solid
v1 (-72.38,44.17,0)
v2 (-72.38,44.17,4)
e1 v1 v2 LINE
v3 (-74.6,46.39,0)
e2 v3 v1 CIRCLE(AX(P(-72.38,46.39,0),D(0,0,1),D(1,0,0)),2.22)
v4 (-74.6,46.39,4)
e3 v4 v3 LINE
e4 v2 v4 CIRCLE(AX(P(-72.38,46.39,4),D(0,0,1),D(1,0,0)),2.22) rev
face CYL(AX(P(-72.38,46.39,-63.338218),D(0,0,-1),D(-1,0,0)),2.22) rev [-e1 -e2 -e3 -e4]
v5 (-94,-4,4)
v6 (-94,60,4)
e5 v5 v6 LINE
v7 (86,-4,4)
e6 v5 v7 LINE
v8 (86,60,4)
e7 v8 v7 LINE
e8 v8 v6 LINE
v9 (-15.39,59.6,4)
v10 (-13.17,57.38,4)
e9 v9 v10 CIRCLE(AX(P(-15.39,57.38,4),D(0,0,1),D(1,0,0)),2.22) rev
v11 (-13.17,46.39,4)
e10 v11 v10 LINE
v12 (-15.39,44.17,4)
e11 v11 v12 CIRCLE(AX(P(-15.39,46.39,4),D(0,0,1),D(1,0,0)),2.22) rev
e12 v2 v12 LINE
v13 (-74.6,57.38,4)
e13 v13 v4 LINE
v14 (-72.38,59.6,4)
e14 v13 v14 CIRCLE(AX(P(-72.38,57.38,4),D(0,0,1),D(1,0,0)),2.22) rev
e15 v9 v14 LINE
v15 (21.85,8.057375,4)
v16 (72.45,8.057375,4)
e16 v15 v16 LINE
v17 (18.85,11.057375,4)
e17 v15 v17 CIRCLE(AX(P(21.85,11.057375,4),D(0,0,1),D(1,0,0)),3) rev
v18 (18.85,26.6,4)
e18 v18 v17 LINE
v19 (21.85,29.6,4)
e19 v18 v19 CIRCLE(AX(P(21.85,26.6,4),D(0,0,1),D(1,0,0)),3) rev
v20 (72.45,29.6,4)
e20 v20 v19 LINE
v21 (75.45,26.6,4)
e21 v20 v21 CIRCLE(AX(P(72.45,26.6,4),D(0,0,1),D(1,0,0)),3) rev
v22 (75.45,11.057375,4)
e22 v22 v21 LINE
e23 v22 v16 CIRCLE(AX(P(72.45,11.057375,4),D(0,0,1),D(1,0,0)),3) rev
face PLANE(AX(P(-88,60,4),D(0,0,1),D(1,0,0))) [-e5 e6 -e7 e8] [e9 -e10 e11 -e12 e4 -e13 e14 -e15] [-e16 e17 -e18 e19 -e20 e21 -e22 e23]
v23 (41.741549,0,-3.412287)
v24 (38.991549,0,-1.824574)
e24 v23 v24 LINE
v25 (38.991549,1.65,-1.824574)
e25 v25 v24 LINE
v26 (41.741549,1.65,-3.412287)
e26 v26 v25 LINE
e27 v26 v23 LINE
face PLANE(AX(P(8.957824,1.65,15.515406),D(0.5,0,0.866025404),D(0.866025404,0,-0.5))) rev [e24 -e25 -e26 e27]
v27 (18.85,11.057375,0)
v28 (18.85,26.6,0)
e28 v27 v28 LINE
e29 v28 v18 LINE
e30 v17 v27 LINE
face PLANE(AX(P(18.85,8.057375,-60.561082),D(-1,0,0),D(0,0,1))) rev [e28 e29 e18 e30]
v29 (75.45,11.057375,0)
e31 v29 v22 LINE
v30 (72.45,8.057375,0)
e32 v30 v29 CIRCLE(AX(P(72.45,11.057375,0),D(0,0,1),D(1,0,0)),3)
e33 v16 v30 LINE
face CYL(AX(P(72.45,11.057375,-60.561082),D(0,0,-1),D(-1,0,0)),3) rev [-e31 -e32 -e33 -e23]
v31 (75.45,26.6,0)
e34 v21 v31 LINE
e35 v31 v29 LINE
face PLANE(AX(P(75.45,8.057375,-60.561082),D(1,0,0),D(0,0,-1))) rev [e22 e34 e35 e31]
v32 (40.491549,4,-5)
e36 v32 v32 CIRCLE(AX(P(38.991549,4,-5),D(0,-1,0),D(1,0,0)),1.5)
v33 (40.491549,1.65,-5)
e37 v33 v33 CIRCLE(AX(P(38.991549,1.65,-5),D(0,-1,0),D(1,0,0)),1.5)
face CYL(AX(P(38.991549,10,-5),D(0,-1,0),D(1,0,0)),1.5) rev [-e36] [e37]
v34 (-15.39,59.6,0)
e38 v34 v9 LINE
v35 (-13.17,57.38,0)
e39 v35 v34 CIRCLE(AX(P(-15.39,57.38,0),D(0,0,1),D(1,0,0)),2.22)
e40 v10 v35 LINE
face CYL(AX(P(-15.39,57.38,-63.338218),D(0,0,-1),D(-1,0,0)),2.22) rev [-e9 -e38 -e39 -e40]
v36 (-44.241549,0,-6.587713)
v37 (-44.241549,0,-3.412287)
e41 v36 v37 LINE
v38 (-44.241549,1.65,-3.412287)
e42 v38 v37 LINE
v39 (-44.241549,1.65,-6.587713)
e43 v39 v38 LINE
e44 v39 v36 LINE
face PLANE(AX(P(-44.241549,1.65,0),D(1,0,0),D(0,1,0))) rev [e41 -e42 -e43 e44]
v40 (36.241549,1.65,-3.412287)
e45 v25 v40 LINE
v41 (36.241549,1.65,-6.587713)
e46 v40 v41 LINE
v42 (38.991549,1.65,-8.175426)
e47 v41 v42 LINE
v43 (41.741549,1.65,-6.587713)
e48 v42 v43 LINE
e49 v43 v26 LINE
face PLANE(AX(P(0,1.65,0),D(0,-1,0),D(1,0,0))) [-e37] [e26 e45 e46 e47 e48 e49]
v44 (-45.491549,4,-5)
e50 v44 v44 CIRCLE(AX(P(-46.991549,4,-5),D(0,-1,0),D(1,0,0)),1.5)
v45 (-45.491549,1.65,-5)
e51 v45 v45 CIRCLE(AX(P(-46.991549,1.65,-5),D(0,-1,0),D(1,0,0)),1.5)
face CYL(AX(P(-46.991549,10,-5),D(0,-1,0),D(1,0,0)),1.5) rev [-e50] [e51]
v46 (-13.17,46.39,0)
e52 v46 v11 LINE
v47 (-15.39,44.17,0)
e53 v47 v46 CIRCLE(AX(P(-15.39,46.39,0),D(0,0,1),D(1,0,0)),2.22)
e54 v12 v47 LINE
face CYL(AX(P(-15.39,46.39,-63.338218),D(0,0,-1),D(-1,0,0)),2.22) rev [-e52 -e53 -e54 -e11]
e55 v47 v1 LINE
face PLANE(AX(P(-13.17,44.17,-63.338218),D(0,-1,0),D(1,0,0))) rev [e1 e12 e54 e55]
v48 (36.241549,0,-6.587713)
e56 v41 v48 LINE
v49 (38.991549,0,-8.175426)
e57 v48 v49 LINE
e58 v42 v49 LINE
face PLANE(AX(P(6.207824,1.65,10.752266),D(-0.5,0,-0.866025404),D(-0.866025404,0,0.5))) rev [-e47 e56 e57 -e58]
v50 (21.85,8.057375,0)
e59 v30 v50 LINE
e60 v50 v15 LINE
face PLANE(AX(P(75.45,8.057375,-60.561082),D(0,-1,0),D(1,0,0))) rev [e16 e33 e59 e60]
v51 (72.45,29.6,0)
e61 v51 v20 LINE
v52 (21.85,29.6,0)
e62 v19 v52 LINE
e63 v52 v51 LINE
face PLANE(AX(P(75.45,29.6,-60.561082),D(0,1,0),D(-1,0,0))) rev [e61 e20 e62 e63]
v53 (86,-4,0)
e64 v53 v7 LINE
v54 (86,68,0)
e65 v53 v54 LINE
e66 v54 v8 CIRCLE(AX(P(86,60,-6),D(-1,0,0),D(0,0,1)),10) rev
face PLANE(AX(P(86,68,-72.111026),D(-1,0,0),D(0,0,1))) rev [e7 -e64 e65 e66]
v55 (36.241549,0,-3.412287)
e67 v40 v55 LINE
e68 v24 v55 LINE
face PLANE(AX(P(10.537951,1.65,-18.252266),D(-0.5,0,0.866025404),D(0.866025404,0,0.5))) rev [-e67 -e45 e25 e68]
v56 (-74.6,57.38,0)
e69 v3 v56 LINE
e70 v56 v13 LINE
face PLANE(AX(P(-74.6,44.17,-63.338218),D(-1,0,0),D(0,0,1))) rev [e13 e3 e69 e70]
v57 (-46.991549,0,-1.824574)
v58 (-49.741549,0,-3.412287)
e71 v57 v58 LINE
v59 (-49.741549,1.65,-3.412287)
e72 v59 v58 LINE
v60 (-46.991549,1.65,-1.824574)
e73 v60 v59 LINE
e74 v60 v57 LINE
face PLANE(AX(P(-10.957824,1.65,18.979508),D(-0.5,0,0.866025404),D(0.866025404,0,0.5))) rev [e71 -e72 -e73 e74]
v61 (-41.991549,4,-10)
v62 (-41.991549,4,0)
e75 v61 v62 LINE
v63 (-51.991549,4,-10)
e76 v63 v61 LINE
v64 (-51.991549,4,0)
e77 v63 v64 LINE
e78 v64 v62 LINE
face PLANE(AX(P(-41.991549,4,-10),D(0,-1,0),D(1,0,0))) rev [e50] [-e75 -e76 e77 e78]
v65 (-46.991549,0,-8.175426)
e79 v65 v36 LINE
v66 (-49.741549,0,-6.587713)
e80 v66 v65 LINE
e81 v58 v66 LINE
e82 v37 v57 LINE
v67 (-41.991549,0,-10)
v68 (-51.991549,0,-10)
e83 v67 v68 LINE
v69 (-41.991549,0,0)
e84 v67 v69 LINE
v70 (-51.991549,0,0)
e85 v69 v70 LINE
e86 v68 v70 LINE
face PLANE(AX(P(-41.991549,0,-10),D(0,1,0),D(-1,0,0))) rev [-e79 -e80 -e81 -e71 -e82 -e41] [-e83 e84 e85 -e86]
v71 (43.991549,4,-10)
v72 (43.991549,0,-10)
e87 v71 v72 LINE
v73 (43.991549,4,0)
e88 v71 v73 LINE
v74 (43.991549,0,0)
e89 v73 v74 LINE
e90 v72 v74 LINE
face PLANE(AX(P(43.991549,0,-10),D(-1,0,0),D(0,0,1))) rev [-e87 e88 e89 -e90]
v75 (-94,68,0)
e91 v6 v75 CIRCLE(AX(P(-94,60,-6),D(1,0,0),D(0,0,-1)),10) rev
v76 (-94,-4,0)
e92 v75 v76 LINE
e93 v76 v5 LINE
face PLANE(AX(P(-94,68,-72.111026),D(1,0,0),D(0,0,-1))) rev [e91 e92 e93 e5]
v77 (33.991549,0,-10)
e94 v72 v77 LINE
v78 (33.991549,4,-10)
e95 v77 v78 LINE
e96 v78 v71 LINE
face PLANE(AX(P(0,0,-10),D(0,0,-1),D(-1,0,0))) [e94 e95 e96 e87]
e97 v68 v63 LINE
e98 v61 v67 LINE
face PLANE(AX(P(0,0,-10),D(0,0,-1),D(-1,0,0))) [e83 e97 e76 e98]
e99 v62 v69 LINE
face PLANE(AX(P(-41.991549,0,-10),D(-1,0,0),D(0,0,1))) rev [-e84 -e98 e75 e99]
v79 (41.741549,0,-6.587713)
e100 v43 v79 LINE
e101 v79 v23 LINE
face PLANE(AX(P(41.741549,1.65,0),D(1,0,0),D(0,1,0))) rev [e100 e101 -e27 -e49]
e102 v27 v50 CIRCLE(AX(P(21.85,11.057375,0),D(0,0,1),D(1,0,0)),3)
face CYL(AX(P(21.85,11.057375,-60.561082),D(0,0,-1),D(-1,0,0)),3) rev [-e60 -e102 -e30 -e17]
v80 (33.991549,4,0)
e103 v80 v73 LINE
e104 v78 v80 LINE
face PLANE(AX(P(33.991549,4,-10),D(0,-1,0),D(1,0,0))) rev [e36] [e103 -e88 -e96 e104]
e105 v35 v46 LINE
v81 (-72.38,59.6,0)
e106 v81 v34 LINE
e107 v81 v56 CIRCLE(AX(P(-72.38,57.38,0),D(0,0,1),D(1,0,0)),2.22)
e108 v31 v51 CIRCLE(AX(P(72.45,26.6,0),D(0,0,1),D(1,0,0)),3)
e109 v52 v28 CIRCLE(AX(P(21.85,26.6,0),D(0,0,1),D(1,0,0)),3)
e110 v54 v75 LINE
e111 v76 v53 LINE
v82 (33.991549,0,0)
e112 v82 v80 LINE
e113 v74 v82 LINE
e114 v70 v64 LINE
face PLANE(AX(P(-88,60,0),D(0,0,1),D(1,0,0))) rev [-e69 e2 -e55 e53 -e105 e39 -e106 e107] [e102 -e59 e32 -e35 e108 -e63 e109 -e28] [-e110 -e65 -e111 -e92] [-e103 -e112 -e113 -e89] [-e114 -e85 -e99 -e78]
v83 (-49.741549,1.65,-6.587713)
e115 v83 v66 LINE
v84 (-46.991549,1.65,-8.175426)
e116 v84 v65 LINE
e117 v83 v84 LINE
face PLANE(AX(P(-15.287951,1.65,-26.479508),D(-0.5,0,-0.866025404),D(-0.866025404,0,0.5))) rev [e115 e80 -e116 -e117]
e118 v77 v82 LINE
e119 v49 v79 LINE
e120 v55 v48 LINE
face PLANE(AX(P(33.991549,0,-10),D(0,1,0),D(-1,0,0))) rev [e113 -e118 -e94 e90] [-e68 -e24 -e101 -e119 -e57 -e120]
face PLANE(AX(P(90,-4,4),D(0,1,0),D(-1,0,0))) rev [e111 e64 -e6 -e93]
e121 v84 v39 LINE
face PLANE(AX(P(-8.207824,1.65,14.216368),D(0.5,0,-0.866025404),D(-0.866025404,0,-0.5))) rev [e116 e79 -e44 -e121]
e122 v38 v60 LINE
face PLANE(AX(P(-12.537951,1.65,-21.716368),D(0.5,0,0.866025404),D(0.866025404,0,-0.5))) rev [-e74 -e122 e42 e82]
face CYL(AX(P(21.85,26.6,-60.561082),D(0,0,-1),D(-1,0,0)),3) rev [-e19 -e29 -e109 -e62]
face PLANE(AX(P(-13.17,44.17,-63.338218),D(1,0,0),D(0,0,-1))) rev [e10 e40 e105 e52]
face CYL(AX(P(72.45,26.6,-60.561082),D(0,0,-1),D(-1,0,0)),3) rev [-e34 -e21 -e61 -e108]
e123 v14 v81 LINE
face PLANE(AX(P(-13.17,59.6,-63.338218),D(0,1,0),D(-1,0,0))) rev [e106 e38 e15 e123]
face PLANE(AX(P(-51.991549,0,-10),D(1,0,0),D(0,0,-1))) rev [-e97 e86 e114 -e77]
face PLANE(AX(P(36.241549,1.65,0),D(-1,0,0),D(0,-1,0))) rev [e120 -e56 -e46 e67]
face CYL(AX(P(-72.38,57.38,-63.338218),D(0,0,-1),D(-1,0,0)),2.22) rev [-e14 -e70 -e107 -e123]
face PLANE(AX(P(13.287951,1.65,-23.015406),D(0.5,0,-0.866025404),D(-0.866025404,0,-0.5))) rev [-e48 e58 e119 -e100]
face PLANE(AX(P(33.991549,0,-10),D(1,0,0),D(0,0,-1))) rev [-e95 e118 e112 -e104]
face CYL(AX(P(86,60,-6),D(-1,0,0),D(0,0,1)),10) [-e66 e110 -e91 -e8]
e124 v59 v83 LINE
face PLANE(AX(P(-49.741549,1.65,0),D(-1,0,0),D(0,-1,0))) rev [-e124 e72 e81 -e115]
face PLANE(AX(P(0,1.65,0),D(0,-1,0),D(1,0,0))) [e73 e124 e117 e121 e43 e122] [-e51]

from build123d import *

# Parameters (mm, degrees)
SALIENTE_EXTRUIR1_DEPTH = 4
CROQUIS2_W              = 10
CROQUIS2_H              = 4
SALIENTE_EXTRUIR2_DEPTH = 10
CROQUIS3_R              = 1.5
CORTAR_EXTRUIR1_DEPTH   = 10
CROQUIS3_3_R            = 1.5
CORTAR_EXTRUIR2_DEPTH   = 1.65
REDONDEO2_R             = 10
CORTAR_EXTRUIR4_REACH   = 121.7
CROQUIS4_W              = 14.4
CROQUIS4_H              = 16.36262465
CROQUIS4_W_2            = 16.3
CROQUIS4_H_2            = 13.9
CROQUIS4_W_3            = 15.3
CROQUIS4_H_3            = 16.22
CROQUIS5_W              = 56.6
CROQUIS5_H              = 21.54262465
CORTAR_EXTRUIR5_DEPTH   = 4
REDONDEO3_R             = 3
CROQUIS6_W              = 61.43
CROQUIS6_H              = 15.43
CORTAR_EXTRUIR6_DEPTH   = 4
REDONDEO4_R             = 2.22
CROQUIS8_W              = 4
CROQUIS8_H              = 72
CORTAR_EXTRUIR7_DEPTH   = 4


with BuildPart() as part:
    # Croquis1 → Saliente-Extruir1 (new body)
    with BuildSketch(Plane.XY):
        with BuildLine():
            Line((-98, 60), (-98, -4))
            Line((-98, -4), (90, -4))
            Line((90, -4), (90, 60))
            ThreePointArc((90, 60), (88.94427191, 64.472135955), (86, 68))
            Line((86, 68), (-94, 68))
            ThreePointArc((-94, 68), (-96.94427191, 64.472135955), (-98, 60))
        make_face()
    extrude(amount=SALIENTE_EXTRUIR1_DEPTH)

    # Croquis2 → Saliente-Extruir2 (add)
    with BuildSketch(Plane(origin=(0, 0, 0), x_dir=(-1, 0, 0), z_dir=(0, 0, -1))):
        with Locations((46.991549296, 2)):
            Rectangle(CROQUIS2_W, CROQUIS2_H)
        with Locations((-38.991549296, 2)):
            Rectangle(CROQUIS2_W, CROQUIS2_H)
    extrude(amount=SALIENTE_EXTRUIR2_DEPTH)

    # Croquis3 → Cortar-Extruir1 (cut)
    with BuildSketch(Plane.XZ):
        with Locations((38.991549296, -5)):
            Circle(CROQUIS3_R)
        with Locations((-46.991549296, -5)):
            Circle(CROQUIS3_R)
    extrude(amount=-CORTAR_EXTRUIR1_DEPTH, mode=Mode.SUBTRACT)

    # Croquis3<3> → Cortar-Extruir2 (cut)
    # profile 1 of 2: a face of its own
    with BuildSketch(Plane.XZ):
        Polygon((-46.991549296, -8.175426481), (-44.241549296, -6.58771324), (-44.241549296, -3.41228676), (-46.991549296, -1.824573519), (-49.741549296, -3.41228676), (-49.741549296, -6.58771324), align=None)
        with Locations((-46.991549296, -5)):
            Circle(CROQUIS3_3_R, mode=Mode.SUBTRACT)
    # profile 2 of 2: a face of its own
    with BuildSketch(Plane.XZ):
        Polygon((38.991549296, -8.175426481), (41.741549296, -6.58771324), (41.741549296, -3.41228676), (38.991549296, -1.824573519), (36.241549296, -3.41228676), (36.241549296, -6.58771324), align=None)
        with Locations((38.991549296, -5)):
            Circle(CROQUIS3_3_R, mode=Mode.SUBTRACT)
    extrude(amount=-CORTAR_EXTRUIR2_DEPTH, mode=Mode.SUBTRACT)

    # Redondeo2
    # the kernel refuses this fillet: 10 mm, written as the material it takes off along each edge
    with BuildSketch(Plane(origin=(106, 68, 4), x_dir=(0, -1, 0), z_dir=(-1, 0, 0))) as redondeo2_piece_1:
        with BuildLine():
            CenterArc((8, -10), REDONDEO2_R, 90, 53.130102354)
            Line((0, -4), (-0.16, -3.88))
            ThreePointArc((-0.16, -3.88), (-0.2, -2), (-0.2, 0))
            Line((-0.2, 0), (0, 0.2))
            Line((0, 0.2), (8, 0.2))
            Line((8, 0.2), (8, 0))
        make_face()
    extrude(amount=220, mode=Mode.SUBTRACT)

    # Croquis4 → Cortar-Extruir4 (cut, up to next)
    with BuildSketch(Plane(origin=(0, 0, 0), x_dir=(-1, 0, 0), z_dir=(0, 0, -1)), mode=Mode.PRIVATE) as cortar_extruir4_sk1:
        with Locations((-46.4, 18.238687675)):
            Rectangle(CROQUIS4_W, CROQUIS4_H)
    cortar_extruir4_tool1 = extrude(cortar_extruir4_sk1.sketch, amount=-CORTAR_EXTRUIR4_REACH, mode=Mode.PRIVATE) & part.part
    # Croquis4 → Cortar-Extruir4 (cut, up to next)
    with BuildSketch(Plane(origin=(0, 0, 0), x_dir=(-1, 0, 0), z_dir=(0, 0, -1)), mode=Mode.PRIVATE) as cortar_extruir4_sk2:
        with Locations((-65.3, 20.65)):
            Rectangle(CROQUIS4_W_2, CROQUIS4_H_2)
    cortar_extruir4_tool2 = extrude(cortar_extruir4_sk2.sketch, amount=-CORTAR_EXTRUIR4_REACH, mode=Mode.PRIVATE) & part.part
    # Croquis4 → Cortar-Extruir4 (cut, up to next)
    with BuildSketch(Plane(origin=(0, 0, 0), x_dir=(-1, 0, 0), z_dir=(0, 0, -1)), mode=Mode.PRIVATE) as cortar_extruir4_sk3:
        with Locations((-28.5, 19.49)):
            Rectangle(CROQUIS4_W_3, CROQUIS4_H_3)
    cortar_extruir4_tool3 = extrude(cortar_extruir4_sk3.sketch, amount=-CORTAR_EXTRUIR4_REACH, mode=Mode.PRIVATE) & part.part
    add(cortar_extruir4_tool1.solids().sort_by_distance((46.4, 18.238688, 0))[0], mode=Mode.SUBTRACT)
    add(cortar_extruir4_tool2.solids().sort_by_distance((65.3, 20.65, 0))[0], mode=Mode.SUBTRACT)
    add(cortar_extruir4_tool3.solids().sort_by_distance((28.5, 19.49, 0))[0], mode=Mode.SUBTRACT)

    # Croquis5 → Cortar-Extruir5 (cut)
    with BuildSketch(Plane.XY.offset(4)):
        with Locations((47.15, 18.828687675)):
            Rectangle(CROQUIS5_W, CROQUIS5_H)
    extrude(amount=-CORTAR_EXTRUIR5_DEPTH, mode=Mode.SUBTRACT)

    # Redondeo3
    redondeo3_edges = [part.edges().sort_by_distance(p)[0] for p in [
        (75.45, 29.6, 2),
        (75.45, 8.05737535, 2),
        (18.85, 8.05737535, 2),
        (18.85, 29.6, 2),
    ]]
    fillet(redondeo3_edges, radius=REDONDEO3_R)

    # Croquis6 → Cortar-Extruir6 (cut)
    with BuildSketch(Plane.XY.offset(4)):
        with Locations((-43.885, 51.885)):
            Rectangle(CROQUIS6_W, CROQUIS6_H)
    extrude(amount=-CORTAR_EXTRUIR6_DEPTH, mode=Mode.SUBTRACT)

    # Redondeo4
    redondeo4_edges = [part.edges().sort_by_distance(p)[0] for p in [
        (-13.17, 59.6, 2),
        (-13.17, 44.17, 2),
        (-74.6, 44.17, 2),
        (-74.6, 59.6, 2),
    ]]
    fillet(redondeo4_edges, radius=REDONDEO4_R)

    # Croquis8 → Cortar-Extruir7 (cut)
    with BuildSketch(Plane.XY.offset(4)):
        with Locations((88, 32)):
            Rectangle(CROQUIS8_W, CROQUIS8_H)
        with Locations((-96, 32)):
            Rectangle(CROQUIS8_W, CROQUIS8_H)
    extrude(amount=-CORTAR_EXTRUIR7_DEPTH, mode=Mode.SUBTRACT)


solid = part.part
